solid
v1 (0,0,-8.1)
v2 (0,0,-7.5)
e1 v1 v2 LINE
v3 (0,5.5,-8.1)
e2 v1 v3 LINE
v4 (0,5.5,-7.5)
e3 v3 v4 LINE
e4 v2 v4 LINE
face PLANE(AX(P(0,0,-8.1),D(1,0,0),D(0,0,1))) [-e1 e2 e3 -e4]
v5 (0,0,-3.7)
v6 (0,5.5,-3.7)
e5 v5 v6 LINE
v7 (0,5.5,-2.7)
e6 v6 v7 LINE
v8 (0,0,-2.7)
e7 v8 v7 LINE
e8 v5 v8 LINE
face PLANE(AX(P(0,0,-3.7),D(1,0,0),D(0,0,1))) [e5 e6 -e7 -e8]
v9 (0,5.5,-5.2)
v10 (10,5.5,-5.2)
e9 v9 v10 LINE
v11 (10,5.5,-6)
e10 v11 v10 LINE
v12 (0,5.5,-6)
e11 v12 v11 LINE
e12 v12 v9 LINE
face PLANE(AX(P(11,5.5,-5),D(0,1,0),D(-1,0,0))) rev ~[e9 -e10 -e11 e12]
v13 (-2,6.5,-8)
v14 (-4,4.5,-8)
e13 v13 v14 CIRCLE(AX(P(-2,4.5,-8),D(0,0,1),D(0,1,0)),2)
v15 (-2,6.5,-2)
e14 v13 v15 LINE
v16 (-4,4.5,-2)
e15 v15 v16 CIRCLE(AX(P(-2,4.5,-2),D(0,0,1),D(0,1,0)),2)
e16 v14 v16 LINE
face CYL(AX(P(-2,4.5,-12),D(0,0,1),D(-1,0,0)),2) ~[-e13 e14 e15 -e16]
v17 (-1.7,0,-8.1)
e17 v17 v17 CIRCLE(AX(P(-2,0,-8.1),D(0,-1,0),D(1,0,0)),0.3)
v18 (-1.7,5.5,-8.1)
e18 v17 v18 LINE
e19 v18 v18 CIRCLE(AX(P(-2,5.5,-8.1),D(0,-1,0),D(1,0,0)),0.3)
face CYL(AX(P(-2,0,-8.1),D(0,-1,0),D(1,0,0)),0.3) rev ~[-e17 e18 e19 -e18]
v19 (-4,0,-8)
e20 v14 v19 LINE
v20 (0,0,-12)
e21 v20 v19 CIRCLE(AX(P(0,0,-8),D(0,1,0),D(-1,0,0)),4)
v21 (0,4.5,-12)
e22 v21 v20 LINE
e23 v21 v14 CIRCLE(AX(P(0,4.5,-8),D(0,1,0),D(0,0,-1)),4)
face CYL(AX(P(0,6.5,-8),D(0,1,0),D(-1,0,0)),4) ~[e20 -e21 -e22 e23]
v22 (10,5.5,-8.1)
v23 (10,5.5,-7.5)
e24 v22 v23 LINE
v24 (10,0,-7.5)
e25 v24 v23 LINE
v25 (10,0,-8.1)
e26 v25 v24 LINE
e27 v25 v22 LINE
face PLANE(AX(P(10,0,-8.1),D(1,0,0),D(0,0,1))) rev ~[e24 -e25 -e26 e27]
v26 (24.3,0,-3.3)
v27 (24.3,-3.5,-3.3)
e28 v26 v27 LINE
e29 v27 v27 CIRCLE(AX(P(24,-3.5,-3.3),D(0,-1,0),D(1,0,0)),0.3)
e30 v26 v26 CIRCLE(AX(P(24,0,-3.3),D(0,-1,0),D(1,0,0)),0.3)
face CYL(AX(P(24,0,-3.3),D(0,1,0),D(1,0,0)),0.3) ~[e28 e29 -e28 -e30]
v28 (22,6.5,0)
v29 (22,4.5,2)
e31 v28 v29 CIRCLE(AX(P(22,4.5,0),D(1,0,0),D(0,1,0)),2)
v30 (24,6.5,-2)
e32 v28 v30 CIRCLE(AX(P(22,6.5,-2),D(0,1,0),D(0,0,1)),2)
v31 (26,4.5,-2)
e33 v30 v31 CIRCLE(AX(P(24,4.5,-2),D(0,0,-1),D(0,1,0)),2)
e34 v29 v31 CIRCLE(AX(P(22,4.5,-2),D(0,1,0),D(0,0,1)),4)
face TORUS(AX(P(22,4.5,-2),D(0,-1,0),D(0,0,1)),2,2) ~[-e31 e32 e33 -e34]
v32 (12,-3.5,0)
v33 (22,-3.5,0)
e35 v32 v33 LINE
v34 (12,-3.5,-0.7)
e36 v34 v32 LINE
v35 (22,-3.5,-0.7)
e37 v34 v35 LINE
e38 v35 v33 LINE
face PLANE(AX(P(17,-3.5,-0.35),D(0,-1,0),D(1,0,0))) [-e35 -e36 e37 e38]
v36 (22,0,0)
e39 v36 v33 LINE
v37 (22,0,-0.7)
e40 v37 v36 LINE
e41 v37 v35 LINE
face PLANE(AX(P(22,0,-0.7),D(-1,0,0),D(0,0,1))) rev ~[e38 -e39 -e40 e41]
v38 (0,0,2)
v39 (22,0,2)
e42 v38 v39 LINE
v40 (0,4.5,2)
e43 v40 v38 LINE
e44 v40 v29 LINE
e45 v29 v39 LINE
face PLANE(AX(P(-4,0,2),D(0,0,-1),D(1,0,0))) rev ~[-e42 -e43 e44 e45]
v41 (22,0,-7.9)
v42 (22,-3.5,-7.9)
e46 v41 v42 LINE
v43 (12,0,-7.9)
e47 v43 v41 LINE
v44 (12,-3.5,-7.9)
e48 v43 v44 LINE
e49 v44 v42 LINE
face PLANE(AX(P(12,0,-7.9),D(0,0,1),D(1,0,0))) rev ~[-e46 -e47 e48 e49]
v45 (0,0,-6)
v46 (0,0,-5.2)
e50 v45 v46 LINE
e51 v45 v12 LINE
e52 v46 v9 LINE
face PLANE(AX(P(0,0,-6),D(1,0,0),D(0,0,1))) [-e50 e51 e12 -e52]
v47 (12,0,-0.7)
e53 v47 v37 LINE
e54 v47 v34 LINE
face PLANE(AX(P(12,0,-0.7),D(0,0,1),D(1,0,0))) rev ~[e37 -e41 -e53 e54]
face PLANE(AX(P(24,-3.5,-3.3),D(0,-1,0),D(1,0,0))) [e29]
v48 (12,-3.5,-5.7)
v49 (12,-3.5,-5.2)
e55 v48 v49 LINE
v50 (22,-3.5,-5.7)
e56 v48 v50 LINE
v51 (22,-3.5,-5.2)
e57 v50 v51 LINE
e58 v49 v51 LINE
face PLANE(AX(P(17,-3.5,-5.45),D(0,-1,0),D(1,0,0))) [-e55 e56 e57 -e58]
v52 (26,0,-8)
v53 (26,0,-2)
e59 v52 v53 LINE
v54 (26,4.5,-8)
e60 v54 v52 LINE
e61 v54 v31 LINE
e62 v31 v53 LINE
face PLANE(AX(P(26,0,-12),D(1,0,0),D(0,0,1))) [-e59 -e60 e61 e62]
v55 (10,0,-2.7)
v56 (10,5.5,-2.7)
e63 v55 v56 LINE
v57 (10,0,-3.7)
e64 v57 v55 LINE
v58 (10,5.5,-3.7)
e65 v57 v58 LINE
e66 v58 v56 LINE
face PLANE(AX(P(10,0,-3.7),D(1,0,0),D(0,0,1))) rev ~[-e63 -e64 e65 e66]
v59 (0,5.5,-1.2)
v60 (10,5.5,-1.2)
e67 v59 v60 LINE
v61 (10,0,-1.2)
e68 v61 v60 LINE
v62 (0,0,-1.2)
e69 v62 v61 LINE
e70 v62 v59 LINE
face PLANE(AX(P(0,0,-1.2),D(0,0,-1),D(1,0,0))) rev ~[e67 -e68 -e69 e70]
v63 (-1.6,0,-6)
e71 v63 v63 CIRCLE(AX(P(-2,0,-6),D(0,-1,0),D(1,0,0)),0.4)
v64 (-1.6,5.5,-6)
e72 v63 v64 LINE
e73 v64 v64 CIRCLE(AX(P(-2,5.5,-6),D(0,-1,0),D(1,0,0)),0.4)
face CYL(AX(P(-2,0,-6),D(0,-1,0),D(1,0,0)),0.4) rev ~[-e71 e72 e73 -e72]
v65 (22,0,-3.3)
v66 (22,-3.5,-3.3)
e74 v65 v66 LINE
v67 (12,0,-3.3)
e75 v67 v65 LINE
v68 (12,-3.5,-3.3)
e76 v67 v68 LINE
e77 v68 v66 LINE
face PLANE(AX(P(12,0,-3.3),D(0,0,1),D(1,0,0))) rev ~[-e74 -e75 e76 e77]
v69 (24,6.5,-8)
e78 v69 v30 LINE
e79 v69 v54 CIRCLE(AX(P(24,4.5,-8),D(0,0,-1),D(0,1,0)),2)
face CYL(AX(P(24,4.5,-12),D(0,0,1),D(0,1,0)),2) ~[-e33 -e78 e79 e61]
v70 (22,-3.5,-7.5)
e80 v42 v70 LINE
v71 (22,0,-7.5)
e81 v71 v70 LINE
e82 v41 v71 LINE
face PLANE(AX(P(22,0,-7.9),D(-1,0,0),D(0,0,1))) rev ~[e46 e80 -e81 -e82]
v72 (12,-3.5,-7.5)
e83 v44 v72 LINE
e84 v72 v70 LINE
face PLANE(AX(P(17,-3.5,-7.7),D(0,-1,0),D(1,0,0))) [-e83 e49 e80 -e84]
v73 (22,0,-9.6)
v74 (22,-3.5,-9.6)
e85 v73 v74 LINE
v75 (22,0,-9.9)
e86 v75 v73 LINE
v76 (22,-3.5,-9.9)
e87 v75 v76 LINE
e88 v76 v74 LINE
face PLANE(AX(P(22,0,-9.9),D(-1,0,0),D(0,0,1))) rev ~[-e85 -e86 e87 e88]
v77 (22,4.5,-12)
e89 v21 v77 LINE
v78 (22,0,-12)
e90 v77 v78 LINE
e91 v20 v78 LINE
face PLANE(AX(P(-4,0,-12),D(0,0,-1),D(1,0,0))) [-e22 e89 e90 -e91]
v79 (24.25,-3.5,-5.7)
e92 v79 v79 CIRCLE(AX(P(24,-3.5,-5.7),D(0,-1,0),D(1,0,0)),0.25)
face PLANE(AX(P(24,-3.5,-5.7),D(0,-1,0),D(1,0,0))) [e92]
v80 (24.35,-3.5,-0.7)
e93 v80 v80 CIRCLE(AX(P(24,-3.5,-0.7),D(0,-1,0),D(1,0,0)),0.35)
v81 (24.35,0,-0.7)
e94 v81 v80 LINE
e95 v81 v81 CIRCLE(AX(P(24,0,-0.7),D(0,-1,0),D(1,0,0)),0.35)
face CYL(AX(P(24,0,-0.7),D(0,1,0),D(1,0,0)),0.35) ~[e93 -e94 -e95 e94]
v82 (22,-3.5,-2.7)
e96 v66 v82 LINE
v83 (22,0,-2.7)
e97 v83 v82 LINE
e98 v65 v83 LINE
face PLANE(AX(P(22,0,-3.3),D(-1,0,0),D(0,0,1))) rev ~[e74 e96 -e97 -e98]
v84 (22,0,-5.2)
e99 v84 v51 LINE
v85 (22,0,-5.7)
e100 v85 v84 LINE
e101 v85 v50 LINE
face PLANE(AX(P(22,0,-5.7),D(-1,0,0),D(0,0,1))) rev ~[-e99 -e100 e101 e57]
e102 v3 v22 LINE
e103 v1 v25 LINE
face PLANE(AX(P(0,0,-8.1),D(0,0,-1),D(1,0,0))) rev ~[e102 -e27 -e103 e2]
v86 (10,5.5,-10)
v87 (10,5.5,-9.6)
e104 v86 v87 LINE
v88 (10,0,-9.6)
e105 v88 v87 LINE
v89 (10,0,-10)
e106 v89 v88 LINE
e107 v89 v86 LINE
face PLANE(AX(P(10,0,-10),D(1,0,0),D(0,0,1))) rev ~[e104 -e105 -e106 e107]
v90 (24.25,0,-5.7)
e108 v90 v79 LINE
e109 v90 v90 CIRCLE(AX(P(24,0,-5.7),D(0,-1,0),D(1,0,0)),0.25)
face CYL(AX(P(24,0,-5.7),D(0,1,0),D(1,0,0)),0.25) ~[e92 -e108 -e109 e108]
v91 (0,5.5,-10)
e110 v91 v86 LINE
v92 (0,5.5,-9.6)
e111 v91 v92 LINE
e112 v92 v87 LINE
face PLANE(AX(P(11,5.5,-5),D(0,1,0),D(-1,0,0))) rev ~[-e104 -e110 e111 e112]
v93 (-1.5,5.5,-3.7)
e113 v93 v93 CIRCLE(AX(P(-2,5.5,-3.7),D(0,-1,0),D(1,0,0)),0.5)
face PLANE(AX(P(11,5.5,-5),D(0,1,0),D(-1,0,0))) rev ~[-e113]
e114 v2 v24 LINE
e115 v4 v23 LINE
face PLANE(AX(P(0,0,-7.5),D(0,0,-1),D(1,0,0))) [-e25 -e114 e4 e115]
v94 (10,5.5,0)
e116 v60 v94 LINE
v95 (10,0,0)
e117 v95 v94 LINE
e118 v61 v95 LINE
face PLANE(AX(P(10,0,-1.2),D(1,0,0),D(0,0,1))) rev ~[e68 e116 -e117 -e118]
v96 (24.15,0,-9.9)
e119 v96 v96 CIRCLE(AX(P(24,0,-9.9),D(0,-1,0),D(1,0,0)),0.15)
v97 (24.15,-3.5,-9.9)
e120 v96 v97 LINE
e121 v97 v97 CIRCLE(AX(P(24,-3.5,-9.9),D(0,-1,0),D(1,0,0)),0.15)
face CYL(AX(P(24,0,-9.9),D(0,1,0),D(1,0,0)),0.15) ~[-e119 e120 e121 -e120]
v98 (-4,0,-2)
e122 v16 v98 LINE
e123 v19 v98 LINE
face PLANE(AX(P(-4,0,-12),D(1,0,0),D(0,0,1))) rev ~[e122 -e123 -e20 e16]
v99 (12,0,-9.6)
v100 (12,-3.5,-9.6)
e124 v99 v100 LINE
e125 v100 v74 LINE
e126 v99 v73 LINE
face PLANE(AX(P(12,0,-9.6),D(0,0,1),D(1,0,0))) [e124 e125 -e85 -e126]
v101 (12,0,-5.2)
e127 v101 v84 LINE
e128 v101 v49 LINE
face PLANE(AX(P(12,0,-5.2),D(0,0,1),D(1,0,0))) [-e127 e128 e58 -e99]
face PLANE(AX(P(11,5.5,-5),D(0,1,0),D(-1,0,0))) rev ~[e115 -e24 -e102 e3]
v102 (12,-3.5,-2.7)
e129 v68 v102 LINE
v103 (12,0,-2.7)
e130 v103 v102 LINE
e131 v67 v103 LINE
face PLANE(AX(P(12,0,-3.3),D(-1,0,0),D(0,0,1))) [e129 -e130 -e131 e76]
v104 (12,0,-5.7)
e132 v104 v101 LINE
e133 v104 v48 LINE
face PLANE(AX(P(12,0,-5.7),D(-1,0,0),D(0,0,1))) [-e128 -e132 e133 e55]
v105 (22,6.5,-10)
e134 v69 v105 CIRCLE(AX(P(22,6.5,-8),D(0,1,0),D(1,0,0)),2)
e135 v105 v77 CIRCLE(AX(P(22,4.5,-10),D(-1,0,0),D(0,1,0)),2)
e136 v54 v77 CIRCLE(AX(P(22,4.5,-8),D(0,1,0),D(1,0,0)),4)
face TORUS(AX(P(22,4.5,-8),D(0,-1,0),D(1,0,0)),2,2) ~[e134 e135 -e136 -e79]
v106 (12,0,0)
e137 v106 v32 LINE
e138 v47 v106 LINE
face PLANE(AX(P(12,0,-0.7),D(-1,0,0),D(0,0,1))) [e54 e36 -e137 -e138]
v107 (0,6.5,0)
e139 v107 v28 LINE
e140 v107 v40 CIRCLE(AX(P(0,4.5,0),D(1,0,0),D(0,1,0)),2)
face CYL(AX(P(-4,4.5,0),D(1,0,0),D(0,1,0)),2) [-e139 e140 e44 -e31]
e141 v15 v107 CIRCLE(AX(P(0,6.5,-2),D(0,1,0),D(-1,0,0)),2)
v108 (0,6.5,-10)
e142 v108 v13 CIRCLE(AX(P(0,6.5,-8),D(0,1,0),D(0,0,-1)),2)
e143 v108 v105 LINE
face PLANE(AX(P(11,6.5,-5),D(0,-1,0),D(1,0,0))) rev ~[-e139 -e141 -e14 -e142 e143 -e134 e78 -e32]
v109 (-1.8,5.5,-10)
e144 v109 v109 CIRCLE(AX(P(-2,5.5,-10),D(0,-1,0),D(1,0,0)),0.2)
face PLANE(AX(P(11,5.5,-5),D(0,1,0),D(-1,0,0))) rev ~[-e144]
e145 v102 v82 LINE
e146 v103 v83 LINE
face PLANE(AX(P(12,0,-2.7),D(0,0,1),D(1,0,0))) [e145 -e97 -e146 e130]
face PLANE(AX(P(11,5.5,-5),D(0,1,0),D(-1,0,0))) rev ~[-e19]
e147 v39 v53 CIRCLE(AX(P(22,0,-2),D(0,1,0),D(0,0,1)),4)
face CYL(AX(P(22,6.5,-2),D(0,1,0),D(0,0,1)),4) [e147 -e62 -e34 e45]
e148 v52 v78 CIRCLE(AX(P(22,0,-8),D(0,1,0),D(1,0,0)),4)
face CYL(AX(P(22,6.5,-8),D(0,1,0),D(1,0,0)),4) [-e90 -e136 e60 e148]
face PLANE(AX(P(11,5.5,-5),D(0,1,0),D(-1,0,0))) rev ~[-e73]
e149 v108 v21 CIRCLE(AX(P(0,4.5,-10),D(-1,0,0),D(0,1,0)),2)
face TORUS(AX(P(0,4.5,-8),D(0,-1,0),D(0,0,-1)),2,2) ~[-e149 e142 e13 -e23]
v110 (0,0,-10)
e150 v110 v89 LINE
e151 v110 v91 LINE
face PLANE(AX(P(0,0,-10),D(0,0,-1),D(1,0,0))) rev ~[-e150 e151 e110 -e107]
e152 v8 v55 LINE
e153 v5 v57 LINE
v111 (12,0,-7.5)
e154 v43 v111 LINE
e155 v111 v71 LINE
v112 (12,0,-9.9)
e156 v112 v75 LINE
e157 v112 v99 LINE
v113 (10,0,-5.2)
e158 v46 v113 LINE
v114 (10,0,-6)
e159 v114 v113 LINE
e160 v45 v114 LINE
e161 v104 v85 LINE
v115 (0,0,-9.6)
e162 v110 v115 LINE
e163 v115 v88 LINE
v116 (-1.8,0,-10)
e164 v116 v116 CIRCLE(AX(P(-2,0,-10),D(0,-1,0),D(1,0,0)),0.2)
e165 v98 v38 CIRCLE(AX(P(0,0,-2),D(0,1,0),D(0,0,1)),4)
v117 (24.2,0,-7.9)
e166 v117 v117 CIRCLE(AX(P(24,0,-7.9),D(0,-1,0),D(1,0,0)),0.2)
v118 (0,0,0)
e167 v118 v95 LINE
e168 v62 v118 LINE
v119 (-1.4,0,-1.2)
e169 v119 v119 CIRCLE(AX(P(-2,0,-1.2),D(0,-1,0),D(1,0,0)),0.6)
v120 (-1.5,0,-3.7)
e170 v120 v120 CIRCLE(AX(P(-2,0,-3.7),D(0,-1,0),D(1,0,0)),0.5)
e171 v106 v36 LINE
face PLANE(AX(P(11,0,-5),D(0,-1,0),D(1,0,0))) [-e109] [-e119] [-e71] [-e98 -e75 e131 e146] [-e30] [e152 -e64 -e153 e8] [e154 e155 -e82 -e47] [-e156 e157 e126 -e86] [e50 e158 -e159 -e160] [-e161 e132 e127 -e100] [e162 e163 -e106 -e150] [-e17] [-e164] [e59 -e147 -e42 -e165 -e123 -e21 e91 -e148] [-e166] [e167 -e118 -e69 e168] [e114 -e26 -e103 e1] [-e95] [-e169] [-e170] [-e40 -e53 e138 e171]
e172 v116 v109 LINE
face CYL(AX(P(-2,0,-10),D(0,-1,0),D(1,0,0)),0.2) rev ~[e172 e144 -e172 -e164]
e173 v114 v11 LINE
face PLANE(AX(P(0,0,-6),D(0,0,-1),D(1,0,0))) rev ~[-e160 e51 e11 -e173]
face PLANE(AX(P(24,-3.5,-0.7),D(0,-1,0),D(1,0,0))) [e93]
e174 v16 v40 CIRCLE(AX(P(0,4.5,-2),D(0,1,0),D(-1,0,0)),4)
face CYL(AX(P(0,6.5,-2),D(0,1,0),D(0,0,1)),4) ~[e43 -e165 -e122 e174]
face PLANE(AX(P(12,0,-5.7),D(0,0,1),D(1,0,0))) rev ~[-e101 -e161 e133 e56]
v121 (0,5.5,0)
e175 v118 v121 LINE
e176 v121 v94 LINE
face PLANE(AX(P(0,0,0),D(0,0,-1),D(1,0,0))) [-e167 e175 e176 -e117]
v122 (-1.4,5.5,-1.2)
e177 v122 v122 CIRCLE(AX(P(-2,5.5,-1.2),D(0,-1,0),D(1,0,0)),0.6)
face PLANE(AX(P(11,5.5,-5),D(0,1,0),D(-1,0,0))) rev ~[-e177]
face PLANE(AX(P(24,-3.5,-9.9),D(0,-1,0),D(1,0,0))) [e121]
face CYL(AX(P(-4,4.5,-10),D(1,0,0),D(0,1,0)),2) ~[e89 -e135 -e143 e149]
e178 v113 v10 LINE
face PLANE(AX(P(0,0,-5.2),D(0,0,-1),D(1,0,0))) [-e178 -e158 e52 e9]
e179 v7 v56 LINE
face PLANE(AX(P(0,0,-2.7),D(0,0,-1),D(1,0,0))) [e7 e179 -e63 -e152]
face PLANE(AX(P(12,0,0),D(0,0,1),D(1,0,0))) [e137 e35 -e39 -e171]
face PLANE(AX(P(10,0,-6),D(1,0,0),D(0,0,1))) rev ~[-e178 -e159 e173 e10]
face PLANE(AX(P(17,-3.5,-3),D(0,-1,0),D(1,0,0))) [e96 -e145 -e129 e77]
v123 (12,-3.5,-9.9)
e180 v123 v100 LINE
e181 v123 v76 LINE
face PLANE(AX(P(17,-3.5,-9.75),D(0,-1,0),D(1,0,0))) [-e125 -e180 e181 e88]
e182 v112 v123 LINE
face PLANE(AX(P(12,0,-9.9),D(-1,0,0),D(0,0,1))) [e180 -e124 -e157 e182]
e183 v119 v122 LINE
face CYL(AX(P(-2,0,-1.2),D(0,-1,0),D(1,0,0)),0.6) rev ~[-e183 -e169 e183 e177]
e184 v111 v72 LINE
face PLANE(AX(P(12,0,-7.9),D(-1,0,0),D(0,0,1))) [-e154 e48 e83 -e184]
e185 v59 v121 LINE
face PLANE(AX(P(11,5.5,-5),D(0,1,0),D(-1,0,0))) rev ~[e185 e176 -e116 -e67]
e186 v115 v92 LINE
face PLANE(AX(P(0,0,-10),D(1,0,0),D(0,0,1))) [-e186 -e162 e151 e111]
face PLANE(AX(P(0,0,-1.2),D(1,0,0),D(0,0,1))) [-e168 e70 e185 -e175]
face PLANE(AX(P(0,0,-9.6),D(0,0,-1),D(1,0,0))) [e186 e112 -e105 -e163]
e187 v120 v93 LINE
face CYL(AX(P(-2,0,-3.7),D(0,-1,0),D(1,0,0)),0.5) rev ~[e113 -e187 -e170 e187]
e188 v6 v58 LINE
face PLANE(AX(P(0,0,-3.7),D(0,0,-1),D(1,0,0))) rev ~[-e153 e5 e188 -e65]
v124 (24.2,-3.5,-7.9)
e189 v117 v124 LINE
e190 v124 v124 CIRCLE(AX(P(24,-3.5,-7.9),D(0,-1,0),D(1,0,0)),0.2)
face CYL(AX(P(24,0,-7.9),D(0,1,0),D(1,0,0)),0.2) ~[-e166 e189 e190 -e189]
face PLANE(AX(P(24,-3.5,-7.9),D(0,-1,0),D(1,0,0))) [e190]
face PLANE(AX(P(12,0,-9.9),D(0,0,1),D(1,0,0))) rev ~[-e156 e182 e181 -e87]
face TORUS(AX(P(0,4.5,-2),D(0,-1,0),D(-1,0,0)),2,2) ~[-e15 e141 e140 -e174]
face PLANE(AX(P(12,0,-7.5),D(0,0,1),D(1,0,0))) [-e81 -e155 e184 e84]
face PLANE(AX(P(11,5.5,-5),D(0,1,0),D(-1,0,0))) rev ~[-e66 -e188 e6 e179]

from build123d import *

# Parameters (mm, degrees)
F0_W         = 30
F0_H         = 14
F0_R         = 0.2
F0_W_2       = 10
F0_H_2       = 0.4
F0_R_2       = 0.3
F0_R_3       = 0.4
F0_H_3       = 0.6
F0_H_4       = 0.8
F0_H_5       = 0.3
F0_R_4       = 0.15
F0_H_6       = 0.5
F0_R_5       = 0.25
F0_R_6       = 0.5
F0_H_7       = 1
F0_R_7       = 0.6
F0_H_8       = 1.2
F0_H_9       = 0.7
F0_R_8       = 0.35
F1_DEPTH     = 6.5
F2_DEPTH     = 3.5
F3_W         = 30
F3_H         = 14
F4_DEPTH     = 1
F5_R         = 2
F6_T1_DEPTH  = 16.5
F6_T4_ANGLE  = 90
F6_T6_ANGLE  = 90
F6_T8_ANGLE  = 90
F6_T10_ANGLE = 90


# Not quite as in the source:
# - a fillet or chamfer that OpenCascade refuses, or shapes differently, is made with other operations: its cross-section is extruded or revolved along the edge and cut away or added


with BuildPart() as f1:
    # F0 (on Front) → F1 (new body)
    with BuildSketch(Plane.XZ):
        with Locations((11, -5)):
            Rectangle(F0_W, F0_H)
        with Locations((-2, -10)):
            Circle(F0_R, mode=Mode.SUBTRACT)
        with Locations((5, -9.8)):
            Rectangle(F0_W_2, F0_H_2, mode=Mode.SUBTRACT)
        with Locations((-2, -8.1)):
            Circle(F0_R_2, mode=Mode.SUBTRACT)
        with Locations((-2, -6)):
            Circle(F0_R_3, mode=Mode.SUBTRACT)
        with Locations((5, -7.8)):
            Rectangle(F0_W_2, F0_H_3, mode=Mode.SUBTRACT)
        with Locations((5, -5.6)):
            Rectangle(F0_W_2, F0_H_4, mode=Mode.SUBTRACT)
        with Locations((17, -9.75)):
            Rectangle(F0_W_2, F0_H_5, mode=Mode.SUBTRACT)
        with Locations((24, -9.9)):
            Circle(F0_R_4, mode=Mode.SUBTRACT)
        with Locations((17, -7.7)):
            Rectangle(F0_W_2, F0_H_2, mode=Mode.SUBTRACT)
        with Locations((17, -5.45)):
            Rectangle(F0_W_2, F0_H_6, mode=Mode.SUBTRACT)
        with Locations((24, -7.9)):
            Circle(F0_R, mode=Mode.SUBTRACT)
        with Locations((24, -5.7)):
            Circle(F0_R_5, mode=Mode.SUBTRACT)
        with Locations((-2, -3.7)):
            Circle(F0_R_6, mode=Mode.SUBTRACT)
        with Locations((5, -3.2)):
            Rectangle(F0_W_2, F0_H_7, mode=Mode.SUBTRACT)
        with Locations((-2, -1.2)):
            Circle(F0_R_7, mode=Mode.SUBTRACT)
        with Locations((5, -0.6)):
            Rectangle(F0_W_2, F0_H_8, mode=Mode.SUBTRACT)
        with Locations((17, -3)):
            Rectangle(F0_W_2, F0_H_3, mode=Mode.SUBTRACT)
        with Locations((24, -3.3)):
            Circle(F0_R_2, mode=Mode.SUBTRACT)
        with Locations((17, -0.35)):
            Rectangle(F0_W_2, F0_H_9, mode=Mode.SUBTRACT)
        with Locations((24, -0.7)):
            Circle(F0_R_8, mode=Mode.SUBTRACT)
        with Locations((17, -0.35)):
            Rectangle(F0_W_2, F0_H_9)
        with Locations((17, -3)):
            Rectangle(F0_W_2, F0_H_3)
        with Locations((17, -5.45)):
            Rectangle(F0_W_2, F0_H_6)
        with Locations((17, -7.7)):
            Rectangle(F0_W_2, F0_H_2)
        with Locations((17, -9.75)):
            Rectangle(F0_W_2, F0_H_5)
        with Locations((24, -0.7)):
            Circle(F0_R_8)
        with Locations((24, -3.3)):
            Circle(F0_R_2)
        with Locations((24, -5.7)):
            Circle(F0_R_5)
        with Locations((24, -7.9)):
            Circle(F0_R)
        with Locations((24, -9.9)):
            Circle(F0_R_4)
    extrude(amount=-F1_DEPTH)

    # F0 (on Front) → F2 (join)
    with BuildSketch(Plane.XZ):
        with Locations((17, -0.35)):
            Rectangle(F0_W_2, F0_H_9)
        with Locations((17, -3)):
            Rectangle(F0_W_2, F0_H_3)
        with Locations((17, -5.45)):
            Rectangle(F0_W_2, F0_H_6)
        with Locations((17, -7.7)):
            Rectangle(F0_W_2, F0_H_2)
        with Locations((17, -9.75)):
            Rectangle(F0_W_2, F0_H_5)
        with Locations((24, -0.7)):
            Circle(F0_R_8)
        with Locations((24, -3.3)):
            Circle(F0_R_2)
        with Locations((24, -5.7)):
            Circle(F0_R_5)
        with Locations((24, -7.9)):
            Circle(F0_R)
        with Locations((24, -9.9)):
            Circle(F0_R_4)
    extrude(amount=F2_DEPTH)

    # F3 (on face) → F4 (join)
    with BuildSketch(Plane(origin=(0, 6.5, 0), x_dir=(-1, 0, 0), z_dir=(0, 1, 0))):
        with Locations((-11, -5)):
            Rectangle(F3_W, F3_H)
    extrude(amount=-F4_DEPTH)

    # F5
    f5_edges = [f1.edges().sort_by_distance(p)[0] for p in [
        (-4, 6.5, -5),
        (11, 6.5, -12),
        (26, 6.5, -5),
        (11, 6.5, 2),
    ]]
    fillet(f5_edges, radius=F5_R)

    # F6: fillet of radius 4 on 4 edges, made by hand

    # F6_s2 → F6_t1 (cut)
    with BuildSketch(Plane.XZ.offset(-6.5)):
        with BuildLine():
            ThreePointArc((-4, -8), (-2.8284271247, -10.8284271247), (0, -12))
            Line((0, -12), (-4, -12))
            Line((-4, -12), (-4, -8))
        make_face()
        with BuildLine():
            ThreePointArc((0, 2), (-2.8284271247, 0.8284271247), (-4, -2))
            Line((-4, -2), (-4, 2))
            Line((-4, 2), (0, 2))
        make_face()
        with BuildLine():
            ThreePointArc((26, -8), (24.8284271247, -10.8284271247), (22, -12))
            Line((22, -12), (26, -12))
            Line((26, -12), (26, -8))
        make_face()
        with BuildLine():
            ThreePointArc((22, 2), (24.8284271247, 0.8284271247), (26, -2))
            Line((26, -2), (26, 2))
            Line((26, 2), (22, 2))
        make_face()
    extrude(amount=F6_T1_DEPTH, mode=Mode.SUBTRACT)

    # F6_s3 → F6_t4 (revolve, cut)
    with BuildSketch(Plane.YZ.offset(22)):
        with BuildLine():
            ThreePointArc((6.5, 0), (5.9142135624, 1.4142135624), (4.5, 2))
            Line((4.5, 2), (6.5, 2))
            Line((6.5, 2), (6.5, 0))
        make_face()
    revolve(axis=Axis((22, 6.5, -2), (0, 1, 0)), revolution_arc=F6_T4_ANGLE, mode=Mode.SUBTRACT)

    # F6_s5 → F6_t6 (revolve, cut)
    with BuildSketch(Plane.XY.offset(-8)):
        with BuildLine():
            ThreePointArc((24, 6.5), (25.4142135624, 5.9142135624), (26, 4.5))
            Line((26, 4.5), (26, 6.5))
            Line((26, 6.5), (24, 6.5))
        make_face()
    revolve(axis=Axis((22, 6.5, -8), (0, 1, 0)), revolution_arc=F6_T6_ANGLE, mode=Mode.SUBTRACT)

    # F6_s7 → F6_t8 (revolve, cut)
    with BuildSketch(Plane.XY.offset(-2)):
        with BuildLine():
            ThreePointArc((-2, 6.5), (-3.4142135624, 5.9142135624), (-4, 4.5))
            Line((-4, 4.5), (-4, 6.5))
            Line((-4, 6.5), (-2, 6.5))
        make_face()
    revolve(axis=Axis((0, 6.5, -2), (0, 1, 0)), revolution_arc=F6_T8_ANGLE, mode=Mode.SUBTRACT)

    # F6_s9 → F6_t10 (revolve, cut)
    with BuildSketch(Plane.YZ):
        with BuildLine():
            ThreePointArc((6.5, -10), (5.9142135624, -11.4142135624), (4.5, -12))
            Line((4.5, -12), (6.5, -12))
            Line((6.5, -12), (6.5, -10))
        make_face()
    revolve(axis=Axis((0, 6.5, -8), (0, 1, 0)), revolution_arc=F6_T10_ANGLE, mode=Mode.SUBTRACT)


solid = f1.part
